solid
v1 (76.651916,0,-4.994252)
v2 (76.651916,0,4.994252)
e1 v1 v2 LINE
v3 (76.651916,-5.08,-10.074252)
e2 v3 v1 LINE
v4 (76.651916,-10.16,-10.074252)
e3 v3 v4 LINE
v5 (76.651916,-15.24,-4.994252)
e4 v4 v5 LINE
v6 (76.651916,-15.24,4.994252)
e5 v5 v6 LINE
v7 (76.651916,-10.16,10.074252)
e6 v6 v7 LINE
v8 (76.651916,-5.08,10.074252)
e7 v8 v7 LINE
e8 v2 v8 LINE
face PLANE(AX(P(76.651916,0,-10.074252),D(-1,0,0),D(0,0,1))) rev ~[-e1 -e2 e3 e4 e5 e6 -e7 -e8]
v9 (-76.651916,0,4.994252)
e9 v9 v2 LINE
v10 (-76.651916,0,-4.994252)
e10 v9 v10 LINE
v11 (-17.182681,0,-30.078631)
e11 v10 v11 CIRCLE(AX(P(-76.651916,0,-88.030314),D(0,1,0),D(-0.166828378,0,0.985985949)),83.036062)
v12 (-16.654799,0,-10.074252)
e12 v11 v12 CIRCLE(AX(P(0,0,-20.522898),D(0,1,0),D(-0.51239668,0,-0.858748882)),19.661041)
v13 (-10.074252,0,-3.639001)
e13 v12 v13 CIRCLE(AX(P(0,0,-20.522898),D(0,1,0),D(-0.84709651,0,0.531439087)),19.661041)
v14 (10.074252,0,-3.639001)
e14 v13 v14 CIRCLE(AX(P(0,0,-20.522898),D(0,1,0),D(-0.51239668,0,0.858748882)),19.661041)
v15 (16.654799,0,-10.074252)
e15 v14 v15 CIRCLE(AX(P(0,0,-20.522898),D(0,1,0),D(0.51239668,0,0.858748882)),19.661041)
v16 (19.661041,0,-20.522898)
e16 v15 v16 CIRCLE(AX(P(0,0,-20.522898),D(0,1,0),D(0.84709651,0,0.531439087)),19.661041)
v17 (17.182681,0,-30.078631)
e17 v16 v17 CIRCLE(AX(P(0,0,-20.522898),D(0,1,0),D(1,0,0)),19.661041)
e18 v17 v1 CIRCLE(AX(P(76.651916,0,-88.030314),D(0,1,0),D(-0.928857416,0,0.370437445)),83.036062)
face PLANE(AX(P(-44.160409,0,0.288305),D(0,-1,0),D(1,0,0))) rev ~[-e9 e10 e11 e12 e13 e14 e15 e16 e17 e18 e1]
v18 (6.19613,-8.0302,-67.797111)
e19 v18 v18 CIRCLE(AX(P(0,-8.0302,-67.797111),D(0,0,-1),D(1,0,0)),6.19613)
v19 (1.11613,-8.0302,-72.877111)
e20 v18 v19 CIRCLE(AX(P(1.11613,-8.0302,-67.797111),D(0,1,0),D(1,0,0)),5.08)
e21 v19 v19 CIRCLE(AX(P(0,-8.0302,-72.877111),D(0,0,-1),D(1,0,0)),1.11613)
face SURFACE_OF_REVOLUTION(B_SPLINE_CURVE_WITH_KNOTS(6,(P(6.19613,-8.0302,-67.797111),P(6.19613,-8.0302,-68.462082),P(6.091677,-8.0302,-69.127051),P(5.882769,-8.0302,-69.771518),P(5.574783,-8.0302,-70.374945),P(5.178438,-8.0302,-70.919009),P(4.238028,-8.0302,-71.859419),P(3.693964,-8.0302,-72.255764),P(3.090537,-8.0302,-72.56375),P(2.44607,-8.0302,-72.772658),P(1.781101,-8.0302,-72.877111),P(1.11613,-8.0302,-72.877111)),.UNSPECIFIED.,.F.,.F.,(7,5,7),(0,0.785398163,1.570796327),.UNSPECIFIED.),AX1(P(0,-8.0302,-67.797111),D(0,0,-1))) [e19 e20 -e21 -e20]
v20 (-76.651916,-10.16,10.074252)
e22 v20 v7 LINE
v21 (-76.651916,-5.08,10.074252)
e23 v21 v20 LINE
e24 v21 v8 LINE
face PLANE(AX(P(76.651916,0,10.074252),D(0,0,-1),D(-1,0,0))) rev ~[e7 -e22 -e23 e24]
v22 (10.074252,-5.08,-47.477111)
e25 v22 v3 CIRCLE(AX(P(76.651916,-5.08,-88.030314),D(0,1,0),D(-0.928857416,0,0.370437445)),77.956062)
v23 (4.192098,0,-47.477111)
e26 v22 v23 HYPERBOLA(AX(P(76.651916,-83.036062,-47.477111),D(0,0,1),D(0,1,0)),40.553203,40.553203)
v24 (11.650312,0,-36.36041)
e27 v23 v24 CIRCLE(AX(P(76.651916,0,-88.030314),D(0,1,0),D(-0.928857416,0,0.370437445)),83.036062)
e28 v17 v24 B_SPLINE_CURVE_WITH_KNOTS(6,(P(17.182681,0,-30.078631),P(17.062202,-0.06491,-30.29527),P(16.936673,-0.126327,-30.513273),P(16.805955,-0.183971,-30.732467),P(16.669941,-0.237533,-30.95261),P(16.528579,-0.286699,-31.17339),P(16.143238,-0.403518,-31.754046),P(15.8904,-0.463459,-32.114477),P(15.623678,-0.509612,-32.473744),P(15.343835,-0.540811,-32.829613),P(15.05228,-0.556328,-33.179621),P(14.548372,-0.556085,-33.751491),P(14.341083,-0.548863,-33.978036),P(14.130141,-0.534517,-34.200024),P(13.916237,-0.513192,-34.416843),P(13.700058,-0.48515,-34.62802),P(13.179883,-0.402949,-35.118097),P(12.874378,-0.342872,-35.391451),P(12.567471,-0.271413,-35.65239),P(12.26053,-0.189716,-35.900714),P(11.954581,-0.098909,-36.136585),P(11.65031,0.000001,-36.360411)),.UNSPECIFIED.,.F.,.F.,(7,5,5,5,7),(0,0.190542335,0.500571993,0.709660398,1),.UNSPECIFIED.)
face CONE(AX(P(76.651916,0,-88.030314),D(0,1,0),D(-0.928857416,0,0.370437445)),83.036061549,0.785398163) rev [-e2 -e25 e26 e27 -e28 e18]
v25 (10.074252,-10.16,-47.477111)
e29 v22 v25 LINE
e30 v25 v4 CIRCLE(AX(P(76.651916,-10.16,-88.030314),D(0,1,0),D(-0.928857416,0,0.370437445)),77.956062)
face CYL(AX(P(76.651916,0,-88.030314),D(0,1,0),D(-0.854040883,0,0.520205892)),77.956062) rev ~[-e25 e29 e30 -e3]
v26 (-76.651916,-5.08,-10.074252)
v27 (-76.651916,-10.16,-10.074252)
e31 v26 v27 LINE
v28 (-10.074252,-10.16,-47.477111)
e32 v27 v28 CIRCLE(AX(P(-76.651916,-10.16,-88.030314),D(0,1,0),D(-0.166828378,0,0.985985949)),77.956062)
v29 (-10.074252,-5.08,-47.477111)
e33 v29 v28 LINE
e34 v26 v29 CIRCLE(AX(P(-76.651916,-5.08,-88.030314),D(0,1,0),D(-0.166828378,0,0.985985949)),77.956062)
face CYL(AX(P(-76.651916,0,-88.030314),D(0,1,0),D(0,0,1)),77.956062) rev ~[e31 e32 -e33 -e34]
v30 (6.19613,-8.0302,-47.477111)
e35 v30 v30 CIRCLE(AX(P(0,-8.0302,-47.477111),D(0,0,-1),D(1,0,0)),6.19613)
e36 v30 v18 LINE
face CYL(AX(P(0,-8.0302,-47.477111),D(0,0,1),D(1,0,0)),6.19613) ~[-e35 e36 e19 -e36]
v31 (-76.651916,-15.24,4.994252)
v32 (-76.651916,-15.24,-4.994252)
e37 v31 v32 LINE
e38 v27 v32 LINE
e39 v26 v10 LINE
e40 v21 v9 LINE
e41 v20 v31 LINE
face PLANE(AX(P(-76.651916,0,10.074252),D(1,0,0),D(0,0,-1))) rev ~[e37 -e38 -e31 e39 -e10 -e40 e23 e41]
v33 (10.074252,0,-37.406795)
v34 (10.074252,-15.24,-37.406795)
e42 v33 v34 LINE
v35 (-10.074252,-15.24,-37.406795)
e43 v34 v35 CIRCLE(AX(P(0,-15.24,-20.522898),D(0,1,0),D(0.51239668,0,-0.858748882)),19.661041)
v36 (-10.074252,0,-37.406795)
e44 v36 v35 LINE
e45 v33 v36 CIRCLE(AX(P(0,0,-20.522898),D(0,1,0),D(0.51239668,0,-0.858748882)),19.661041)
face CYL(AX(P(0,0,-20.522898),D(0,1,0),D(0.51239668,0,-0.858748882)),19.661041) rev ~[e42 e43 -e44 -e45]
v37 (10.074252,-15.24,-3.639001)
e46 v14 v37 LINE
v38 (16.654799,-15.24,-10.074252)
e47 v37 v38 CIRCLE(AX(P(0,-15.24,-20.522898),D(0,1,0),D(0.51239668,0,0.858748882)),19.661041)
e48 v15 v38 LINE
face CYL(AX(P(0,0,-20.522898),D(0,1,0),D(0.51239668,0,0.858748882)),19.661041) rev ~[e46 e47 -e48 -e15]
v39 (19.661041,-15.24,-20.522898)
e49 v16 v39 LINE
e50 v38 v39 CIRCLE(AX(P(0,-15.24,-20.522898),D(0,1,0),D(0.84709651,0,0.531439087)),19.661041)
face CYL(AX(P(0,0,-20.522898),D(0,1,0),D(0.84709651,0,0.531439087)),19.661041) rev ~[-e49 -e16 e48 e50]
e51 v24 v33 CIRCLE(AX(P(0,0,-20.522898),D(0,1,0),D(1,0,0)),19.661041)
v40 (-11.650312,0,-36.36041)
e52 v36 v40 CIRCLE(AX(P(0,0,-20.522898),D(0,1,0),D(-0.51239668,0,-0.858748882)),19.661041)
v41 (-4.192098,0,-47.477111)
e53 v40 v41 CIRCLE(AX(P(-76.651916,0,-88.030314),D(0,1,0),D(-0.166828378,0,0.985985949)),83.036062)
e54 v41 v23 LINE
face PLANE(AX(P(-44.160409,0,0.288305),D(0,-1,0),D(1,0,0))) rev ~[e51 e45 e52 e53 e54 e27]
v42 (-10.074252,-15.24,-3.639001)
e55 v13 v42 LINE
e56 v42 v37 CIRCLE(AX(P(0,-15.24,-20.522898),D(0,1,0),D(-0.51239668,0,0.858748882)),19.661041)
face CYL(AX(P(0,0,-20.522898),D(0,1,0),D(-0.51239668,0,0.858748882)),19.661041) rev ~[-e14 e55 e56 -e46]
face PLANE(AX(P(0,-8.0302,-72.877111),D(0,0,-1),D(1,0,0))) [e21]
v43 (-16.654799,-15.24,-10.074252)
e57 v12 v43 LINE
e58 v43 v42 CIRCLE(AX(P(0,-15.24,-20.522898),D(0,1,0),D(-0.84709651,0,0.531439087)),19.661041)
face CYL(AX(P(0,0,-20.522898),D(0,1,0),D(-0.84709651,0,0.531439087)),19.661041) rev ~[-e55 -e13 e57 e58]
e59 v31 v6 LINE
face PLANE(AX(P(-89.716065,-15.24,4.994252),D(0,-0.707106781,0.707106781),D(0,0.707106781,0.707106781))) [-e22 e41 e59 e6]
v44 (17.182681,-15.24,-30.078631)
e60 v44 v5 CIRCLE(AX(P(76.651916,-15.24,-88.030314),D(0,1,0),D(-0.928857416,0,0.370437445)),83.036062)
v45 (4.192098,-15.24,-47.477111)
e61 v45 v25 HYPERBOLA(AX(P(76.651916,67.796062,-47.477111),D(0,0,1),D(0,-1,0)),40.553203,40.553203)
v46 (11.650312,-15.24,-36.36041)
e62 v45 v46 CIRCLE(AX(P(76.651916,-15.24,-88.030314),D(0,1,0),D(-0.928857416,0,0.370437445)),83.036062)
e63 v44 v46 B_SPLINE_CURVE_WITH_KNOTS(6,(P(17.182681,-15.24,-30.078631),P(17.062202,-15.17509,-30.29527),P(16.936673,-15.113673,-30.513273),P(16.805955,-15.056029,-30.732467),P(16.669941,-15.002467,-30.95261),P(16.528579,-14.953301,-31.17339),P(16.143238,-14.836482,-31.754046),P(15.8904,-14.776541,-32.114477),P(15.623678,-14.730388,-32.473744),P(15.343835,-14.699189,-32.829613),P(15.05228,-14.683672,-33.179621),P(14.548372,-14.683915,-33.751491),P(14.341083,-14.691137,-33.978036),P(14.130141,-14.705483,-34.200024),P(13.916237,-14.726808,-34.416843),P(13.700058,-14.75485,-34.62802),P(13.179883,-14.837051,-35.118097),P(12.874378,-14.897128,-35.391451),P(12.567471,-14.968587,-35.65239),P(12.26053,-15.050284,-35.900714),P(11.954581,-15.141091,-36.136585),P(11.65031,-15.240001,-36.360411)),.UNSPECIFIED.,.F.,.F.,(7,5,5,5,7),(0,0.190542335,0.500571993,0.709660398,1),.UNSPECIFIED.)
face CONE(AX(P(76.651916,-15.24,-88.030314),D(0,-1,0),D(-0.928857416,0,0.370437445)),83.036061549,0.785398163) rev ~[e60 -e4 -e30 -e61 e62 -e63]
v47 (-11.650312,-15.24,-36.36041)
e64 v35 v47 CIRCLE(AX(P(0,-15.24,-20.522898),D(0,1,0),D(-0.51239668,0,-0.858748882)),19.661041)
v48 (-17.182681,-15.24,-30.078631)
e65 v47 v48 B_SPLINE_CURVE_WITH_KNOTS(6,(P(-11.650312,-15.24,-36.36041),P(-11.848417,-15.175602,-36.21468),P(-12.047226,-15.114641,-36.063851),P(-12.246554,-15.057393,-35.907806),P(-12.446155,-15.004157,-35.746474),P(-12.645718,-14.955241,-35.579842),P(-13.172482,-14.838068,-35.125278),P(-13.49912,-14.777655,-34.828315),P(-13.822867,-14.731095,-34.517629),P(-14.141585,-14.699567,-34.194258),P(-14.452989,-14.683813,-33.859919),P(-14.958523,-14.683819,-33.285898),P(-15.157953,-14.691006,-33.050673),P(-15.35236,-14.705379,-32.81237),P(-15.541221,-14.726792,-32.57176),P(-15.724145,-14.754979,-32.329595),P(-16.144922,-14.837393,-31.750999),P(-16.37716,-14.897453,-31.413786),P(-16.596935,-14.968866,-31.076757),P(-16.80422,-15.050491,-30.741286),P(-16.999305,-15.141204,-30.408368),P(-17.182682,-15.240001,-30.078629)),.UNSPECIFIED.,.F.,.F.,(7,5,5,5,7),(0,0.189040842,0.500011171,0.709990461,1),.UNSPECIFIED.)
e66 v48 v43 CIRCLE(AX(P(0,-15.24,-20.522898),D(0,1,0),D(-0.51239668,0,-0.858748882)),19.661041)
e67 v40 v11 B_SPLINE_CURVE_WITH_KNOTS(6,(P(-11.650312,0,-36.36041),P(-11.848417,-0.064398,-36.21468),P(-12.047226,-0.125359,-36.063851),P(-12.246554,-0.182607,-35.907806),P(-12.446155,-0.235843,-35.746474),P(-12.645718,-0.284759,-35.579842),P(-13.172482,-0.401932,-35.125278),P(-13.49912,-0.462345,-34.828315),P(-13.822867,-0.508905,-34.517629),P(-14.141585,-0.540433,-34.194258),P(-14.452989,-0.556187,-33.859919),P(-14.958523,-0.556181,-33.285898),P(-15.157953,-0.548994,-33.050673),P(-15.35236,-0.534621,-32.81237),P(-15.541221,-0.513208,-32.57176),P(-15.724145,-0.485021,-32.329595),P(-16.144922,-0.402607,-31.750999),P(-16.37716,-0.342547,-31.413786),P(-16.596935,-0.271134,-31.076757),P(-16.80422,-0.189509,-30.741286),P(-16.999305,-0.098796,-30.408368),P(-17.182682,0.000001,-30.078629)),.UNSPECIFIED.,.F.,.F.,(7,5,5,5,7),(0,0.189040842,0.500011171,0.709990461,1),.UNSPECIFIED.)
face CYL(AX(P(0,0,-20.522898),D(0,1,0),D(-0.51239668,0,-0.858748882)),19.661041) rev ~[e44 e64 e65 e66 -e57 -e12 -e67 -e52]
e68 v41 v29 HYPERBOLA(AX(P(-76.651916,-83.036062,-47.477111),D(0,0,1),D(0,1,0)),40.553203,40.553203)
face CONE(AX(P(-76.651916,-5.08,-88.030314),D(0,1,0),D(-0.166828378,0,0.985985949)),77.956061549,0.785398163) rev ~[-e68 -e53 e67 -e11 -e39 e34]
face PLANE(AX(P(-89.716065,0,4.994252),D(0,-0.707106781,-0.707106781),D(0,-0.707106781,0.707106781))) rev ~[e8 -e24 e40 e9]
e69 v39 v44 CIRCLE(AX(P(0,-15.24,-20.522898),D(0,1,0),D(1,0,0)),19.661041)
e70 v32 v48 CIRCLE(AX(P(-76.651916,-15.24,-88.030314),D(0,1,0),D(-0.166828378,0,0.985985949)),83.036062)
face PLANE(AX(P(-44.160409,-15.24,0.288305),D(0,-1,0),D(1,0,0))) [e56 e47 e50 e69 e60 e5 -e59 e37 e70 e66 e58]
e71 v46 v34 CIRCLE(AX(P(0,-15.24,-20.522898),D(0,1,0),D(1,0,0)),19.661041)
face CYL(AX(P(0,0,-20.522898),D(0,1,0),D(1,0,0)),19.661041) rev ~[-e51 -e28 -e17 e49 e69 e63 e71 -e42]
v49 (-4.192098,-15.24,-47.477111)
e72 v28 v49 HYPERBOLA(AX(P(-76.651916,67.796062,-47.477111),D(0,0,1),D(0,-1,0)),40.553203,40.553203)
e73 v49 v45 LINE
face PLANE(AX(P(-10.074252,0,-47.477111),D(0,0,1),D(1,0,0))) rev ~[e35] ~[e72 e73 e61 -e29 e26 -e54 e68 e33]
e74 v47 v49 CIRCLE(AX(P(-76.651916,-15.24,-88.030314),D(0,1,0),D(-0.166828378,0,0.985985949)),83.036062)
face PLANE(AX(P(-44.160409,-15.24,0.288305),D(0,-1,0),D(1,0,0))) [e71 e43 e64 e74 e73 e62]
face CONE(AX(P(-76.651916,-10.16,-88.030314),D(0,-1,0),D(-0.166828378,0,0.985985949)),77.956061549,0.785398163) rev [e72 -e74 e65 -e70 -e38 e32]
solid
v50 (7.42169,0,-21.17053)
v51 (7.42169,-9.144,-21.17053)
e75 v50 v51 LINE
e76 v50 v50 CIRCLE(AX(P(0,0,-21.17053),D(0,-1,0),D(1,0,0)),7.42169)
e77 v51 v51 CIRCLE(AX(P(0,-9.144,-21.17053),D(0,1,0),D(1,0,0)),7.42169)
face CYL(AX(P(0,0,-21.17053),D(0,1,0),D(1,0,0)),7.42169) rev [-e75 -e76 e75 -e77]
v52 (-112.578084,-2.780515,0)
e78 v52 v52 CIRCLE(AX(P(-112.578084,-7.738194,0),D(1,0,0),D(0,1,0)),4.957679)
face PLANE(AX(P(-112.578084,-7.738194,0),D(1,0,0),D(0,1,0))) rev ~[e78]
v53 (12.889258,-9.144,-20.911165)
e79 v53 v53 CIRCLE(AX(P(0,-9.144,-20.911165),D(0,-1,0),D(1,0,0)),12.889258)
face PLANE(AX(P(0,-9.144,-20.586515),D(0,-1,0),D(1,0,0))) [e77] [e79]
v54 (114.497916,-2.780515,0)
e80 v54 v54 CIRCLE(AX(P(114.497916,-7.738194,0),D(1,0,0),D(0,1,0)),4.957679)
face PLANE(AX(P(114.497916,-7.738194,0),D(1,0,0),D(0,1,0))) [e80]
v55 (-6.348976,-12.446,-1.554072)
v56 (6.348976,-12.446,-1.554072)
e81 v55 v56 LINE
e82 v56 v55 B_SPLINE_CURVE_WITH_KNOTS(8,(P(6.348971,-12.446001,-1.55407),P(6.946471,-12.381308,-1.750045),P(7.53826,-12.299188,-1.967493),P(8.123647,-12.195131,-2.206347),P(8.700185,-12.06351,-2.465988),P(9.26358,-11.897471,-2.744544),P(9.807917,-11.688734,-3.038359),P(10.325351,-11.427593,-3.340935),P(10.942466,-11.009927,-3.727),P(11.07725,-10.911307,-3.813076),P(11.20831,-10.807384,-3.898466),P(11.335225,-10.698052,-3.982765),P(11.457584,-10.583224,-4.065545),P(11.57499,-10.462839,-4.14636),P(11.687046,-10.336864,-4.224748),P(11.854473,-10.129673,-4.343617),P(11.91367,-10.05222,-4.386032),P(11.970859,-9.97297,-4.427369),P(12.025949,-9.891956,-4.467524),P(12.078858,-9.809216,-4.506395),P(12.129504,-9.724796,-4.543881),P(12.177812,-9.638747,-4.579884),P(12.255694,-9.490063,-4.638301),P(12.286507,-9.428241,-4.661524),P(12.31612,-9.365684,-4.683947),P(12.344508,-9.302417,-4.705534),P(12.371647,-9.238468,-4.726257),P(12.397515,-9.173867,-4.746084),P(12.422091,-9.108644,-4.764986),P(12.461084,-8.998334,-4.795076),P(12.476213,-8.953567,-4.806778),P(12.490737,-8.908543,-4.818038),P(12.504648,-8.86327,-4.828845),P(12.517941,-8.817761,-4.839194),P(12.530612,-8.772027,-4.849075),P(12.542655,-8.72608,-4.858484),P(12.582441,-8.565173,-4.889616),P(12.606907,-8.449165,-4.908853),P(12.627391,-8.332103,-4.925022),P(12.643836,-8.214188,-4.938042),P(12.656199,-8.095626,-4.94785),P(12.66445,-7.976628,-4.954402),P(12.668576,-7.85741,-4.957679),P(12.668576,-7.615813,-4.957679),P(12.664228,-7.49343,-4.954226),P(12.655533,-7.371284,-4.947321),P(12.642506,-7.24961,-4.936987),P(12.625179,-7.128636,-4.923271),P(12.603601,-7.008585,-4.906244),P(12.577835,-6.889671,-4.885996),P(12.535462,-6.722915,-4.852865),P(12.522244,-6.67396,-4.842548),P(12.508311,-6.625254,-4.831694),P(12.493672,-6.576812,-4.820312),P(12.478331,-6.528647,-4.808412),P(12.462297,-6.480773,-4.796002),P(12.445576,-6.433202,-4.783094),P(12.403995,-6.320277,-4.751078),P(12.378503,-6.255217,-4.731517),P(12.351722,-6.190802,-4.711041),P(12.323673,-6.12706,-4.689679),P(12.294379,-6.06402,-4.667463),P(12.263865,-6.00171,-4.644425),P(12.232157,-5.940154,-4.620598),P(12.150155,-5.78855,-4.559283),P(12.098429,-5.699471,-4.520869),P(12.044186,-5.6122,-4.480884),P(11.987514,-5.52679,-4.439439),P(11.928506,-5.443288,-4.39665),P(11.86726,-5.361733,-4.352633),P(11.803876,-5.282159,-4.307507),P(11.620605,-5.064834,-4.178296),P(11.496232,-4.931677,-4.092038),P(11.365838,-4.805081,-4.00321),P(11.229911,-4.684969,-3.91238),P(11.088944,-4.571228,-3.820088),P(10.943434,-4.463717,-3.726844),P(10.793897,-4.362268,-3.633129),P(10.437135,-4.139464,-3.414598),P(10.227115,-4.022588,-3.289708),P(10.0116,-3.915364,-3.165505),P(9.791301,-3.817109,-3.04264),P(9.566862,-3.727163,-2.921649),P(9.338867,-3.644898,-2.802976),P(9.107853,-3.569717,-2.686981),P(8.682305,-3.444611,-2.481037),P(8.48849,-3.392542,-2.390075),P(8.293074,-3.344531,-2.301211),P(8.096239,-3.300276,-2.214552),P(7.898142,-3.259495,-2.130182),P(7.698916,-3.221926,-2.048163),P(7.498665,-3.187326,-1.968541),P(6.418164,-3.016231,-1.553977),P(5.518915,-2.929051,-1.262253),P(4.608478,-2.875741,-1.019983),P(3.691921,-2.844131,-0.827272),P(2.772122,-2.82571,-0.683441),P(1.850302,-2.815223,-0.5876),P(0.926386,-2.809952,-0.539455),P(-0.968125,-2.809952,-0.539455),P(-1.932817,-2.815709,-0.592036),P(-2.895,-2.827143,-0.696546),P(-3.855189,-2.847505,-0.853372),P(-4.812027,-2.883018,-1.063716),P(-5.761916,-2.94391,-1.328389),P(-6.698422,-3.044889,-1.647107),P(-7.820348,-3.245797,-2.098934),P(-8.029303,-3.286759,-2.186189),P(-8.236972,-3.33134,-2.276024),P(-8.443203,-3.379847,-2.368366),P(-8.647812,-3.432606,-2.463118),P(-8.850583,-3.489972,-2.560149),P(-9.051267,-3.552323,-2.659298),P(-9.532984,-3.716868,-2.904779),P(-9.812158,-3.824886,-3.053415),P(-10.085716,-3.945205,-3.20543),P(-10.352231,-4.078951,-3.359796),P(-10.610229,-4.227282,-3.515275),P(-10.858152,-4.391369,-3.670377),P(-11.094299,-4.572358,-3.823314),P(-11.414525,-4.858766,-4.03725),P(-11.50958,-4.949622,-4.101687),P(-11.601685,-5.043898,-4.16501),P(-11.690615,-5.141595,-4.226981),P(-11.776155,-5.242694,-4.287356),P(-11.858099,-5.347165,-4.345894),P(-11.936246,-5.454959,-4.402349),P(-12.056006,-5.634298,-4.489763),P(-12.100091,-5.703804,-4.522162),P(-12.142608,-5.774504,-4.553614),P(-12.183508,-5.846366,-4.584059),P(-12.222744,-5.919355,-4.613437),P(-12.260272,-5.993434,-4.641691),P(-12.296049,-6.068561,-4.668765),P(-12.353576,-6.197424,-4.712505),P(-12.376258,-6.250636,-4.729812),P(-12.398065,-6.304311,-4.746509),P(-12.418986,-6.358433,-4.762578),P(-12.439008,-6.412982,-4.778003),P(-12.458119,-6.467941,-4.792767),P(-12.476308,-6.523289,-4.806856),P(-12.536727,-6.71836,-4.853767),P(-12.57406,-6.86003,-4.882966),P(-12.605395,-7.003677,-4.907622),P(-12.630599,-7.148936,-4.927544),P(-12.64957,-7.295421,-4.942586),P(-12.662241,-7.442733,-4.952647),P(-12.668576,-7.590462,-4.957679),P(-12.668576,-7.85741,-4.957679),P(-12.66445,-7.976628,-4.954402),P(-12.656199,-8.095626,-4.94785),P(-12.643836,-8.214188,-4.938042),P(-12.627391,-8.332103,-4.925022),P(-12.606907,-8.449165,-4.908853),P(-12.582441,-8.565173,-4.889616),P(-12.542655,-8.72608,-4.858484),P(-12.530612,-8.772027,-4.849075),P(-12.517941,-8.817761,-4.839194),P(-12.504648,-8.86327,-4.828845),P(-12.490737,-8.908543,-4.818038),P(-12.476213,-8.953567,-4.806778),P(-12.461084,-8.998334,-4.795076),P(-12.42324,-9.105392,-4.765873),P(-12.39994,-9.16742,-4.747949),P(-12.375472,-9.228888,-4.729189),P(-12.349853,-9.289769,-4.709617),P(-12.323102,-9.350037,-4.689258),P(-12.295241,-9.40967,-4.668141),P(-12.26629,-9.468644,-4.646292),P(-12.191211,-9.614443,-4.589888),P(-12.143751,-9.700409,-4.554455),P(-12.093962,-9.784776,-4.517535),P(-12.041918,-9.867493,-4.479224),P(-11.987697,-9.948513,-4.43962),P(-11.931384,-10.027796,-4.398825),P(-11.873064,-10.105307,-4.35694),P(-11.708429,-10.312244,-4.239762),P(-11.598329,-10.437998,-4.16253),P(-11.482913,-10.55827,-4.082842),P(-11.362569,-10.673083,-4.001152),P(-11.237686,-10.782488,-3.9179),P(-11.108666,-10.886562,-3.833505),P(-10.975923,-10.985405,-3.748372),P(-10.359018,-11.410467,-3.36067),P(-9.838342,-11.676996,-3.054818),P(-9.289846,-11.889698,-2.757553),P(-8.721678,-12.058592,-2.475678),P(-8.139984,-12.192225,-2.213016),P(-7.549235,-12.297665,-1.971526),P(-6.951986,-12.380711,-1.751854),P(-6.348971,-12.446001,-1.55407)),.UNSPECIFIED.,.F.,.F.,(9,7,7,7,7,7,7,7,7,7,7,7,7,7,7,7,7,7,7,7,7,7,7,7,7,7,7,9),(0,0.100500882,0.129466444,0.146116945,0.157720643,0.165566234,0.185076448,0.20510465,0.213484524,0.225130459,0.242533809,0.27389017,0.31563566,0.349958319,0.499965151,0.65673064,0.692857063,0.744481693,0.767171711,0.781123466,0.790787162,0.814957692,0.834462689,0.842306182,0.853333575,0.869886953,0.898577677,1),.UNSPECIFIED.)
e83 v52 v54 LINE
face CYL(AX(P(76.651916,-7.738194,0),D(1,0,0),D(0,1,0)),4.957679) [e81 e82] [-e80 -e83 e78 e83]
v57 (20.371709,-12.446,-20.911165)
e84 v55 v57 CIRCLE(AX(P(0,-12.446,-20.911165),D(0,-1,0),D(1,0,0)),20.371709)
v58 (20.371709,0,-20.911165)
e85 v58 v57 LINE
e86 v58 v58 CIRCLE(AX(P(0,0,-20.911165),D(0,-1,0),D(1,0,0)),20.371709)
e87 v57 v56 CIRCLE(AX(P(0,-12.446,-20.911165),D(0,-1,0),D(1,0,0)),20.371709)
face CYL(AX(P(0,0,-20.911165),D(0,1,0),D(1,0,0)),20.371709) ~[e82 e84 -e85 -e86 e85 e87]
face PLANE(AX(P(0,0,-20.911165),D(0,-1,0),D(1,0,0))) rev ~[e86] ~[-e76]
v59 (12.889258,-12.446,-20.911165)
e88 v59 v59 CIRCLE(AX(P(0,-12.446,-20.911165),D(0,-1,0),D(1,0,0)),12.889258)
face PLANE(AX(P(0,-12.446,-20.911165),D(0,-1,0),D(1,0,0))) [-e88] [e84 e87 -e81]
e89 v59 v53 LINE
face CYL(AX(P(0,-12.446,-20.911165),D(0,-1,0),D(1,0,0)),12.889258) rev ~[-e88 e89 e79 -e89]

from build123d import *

# Parameters (mm, degrees)
F1_DEPTH      = 15.24
F2_R          = 6.1961301732
F3_DEPTH      = 25.4
F4_R          = 5.08
F5_R          = 4.9576785655
F6_DEPTH      = 37.846
F6_DEPTH_BACK = 189.23
F7_R          = 20.3717092778
F8_DEPTH      = 12.446
F9_R          = 12.889258446
F10_DEPTH     = 7.874
F11_R         = 13.1511811708
F12_DEPTH     = 5.08
F14_R         = 14.9583115279
F13_R         = 7.4216902204
F15_DEPTH     = 9.144
F16_DEPTH     = 47.752
F17_T1_DEPTH  = 179.4321309735
F17_T6_ANGLE  = 77.8608670263
F17_T11_ANGLE = 77.8608670263
F17_T16_ANGLE = 77.8608670263
F17_T21_ANGLE = 77.8608670263


# Not quite as in the source:
# - a fillet or chamfer that OpenCascade refuses, or shapes differently, is made with other operations: its cross-section is extruded or revolved along the edge and cut away or added


with BuildPart() as f1:
    # F0 (on Front) → F1 (new body)
    with BuildSketch(Plane.XZ):
        with BuildLine():
            Line((-76.6519159079, 10.0742522627), (-76.6519159079, -10.0742522627))
            Line((-76.6519159079, -10.0742522627), (-16.654799417, -10.0742522627))
            ThreePointArc((-16.654799417, -10.0742522627), (-13.7464055669, -6.4661247251), (-10.0742522627, -3.6390008817))
            Line((-10.0742522627, -3.6390008817), (-10.0742522627, 10.0742522627))
            Line((-10.0742522627, 10.0742522627), (-76.6519159079, 10.0742522627))
        make_face()
        with BuildLine():
            Line((-16.654799417, -10.0742522627), (-76.6519159079, -10.0742522627))
            ThreePointArc((-76.6519159079, -10.0742522627), (-38.4695929071, -20.0651922972), (-10.0742522627, -47.4771112778))
            Line((-10.0742522627, -47.4771112778), (-10.0742522627, -37.4067952444))
            ThreePointArc((-10.0742522627, -37.4067952444), (-19.1148509643, -25.124964479), (-16.654799417, -10.0742522627))
        make_face()
        with BuildLine():
            Line((10.0742522627, 10.0742522627), (10.0742522627, -3.6390008817))
            ThreePointArc((10.0742522627, -3.6390008817), (13.7464055669, -6.4661247251), (16.654799417, -10.0742522627))
            Line((16.654799417, -10.0742522627), (76.6519159079, -10.0742522627))
            Line((76.6519159079, -10.0742522627), (76.6519159079, 10.0742522627))
            Line((76.6519159079, 10.0742522627), (10.0742522627, 10.0742522627))
        make_face()
        with BuildLine():
            Line((10.0742522627, -37.4067952444), (10.0742522627, -47.4771112778))
            ThreePointArc((10.0742522627, -47.4771112778), (38.4695929071, -20.0651922972), (76.6519159079, -10.0742522627))
            Line((76.6519159079, -10.0742522627), (16.654799417, -10.0742522627))
            ThreePointArc((16.654799417, -10.0742522627), (18.8945394345, -15.0866381133), (19.6610412411, -20.5228980631))
            ThreePointArc((19.6610412411, -20.5228980631), (17.0971756716, -30.230787985), (10.0742522627, -37.4067952444))
        make_face()
        with BuildLine():
            Line((-10.0742522627, 10.0742522627), (-10.0742522627, -3.6390008817))
            ThreePointArc((-10.0742522627, -3.6390008817), (0, -0.861856822), (10.0742522627, -3.6390008817))
            Line((10.0742522627, -3.6390008817), (10.0742522627, 10.0742522627))
            Line((10.0742522627, 10.0742522627), (-10.0742522627, 10.0742522627))
        make_face()
        with BuildLine():
            Line((-10.0742522627, -37.4067952444), (-10.0742522627, -47.4771112778))
            Line((-10.0742522627, -47.4771112778), (10.0742522627, -47.4771112778))
            Line((10.0742522627, -47.4771112778), (10.0742522627, -37.4067952444))
            ThreePointArc((10.0742522627, -37.4067952444), (0, -40.1839393041), (-10.0742522627, -37.4067952444))
        make_face()
    extrude(amount=F1_DEPTH)

    # F2 (on face) → F3 (join)
    with BuildSketch(Plane(origin=(0, 0, -47.4771112778), x_dir=(1, 0, 0), z_dir=(0, 0, -1))):
        with Locations((0, 8.0302003771)):
            Circle(F2_R)
    extrude(amount=F3_DEPTH)

    # F4
    f4_edges = [f1.edges().sort_by_distance(p)[0] for p in [
        (-6.19613, -8.0302, -72.877111),
    ]]
    fillet(f4_edges, radius=F4_R)

    # F17: chamfer of 5.08 on 6 edges, made by hand

    # F17_s2 → F17_t1 (cut)
    with BuildSketch(Plane.YZ.offset(-89.7160654867)):
        Polygon((-15.24, 4.9942522627), (-10.16, 10.0742522627), (-15.24, 10.0742522627), align=None)
        Polygon((0, 4.9942522627), (-5.08, 10.0742522627), (0, 10.0742522627), align=None)
    extrude(amount=F17_T1_DEPTH, mode=Mode.SUBTRACT)


with BuildPart() as f6:
    # F5 (on face) → F6 (new body, two sides)
    with BuildSketch(Plane.YZ.offset(76.6519159079)) as f6_sk:
        with Locations((-7.7381939627, 0)):
            Circle(F5_R)
    extrude(amount=F6_DEPTH)
    extrude(f6_sk.sketch, amount=-F6_DEPTH_BACK)

    # F7 (on Front) → F8 (join)
    with BuildSketch(Plane.XZ):
        with Locations((0, -20.9111645818)):
            Circle(F7_R)
    extrude(amount=F8_DEPTH)

    # F9 (on face) → F10 (cut)
    with BuildSketch(Plane.XZ.offset(12.446)):
        with Locations((0, -20.9111645818)):
            Circle(F9_R)
    extrude(amount=-F10_DEPTH, mode=Mode.SUBTRACT)

    # F11 (on face) → F12 (cut)
    with BuildSketch(Plane(origin=(0, 0, 0), x_dir=(-1, 0, 0), z_dir=(0, 1, 0))):
        with Locations((0, -20.9111645818)):
            Circle(F11_R)
    extrude(amount=-F12_DEPTH, mode=Mode.SUBTRACT)

    # F14 (on face) + F13 (on Front) → F15 (join)
    with BuildSketch(Plane.XZ):
        with Locations((0, -20.5865148455)):
            Circle(F14_R)
    with BuildSketch(Plane.XZ):
        with Locations((0, -21.1705304682)):
            Circle(F13_R)
    extrude(amount=F15_DEPTH)

    # F13 (on Front) → F16 (cut)
    with BuildSketch(Plane.XZ):
        with Locations((0, -21.1705304682)):
            Circle(F13_R)
    extrude(amount=F16_DEPTH, mode=Mode.SUBTRACT)


with BuildPart() as f17_tool4:
    # F17_s5 → F17_t6 (revolve)
    with BuildSketch(Plane(origin=(-88.9987069649, 0, -15.0585411126), x_dir=(0, 1, 0), z_dir=(-0.9859859493, 0, -0.1668283783))):
        Polygon((-10.16, -3.9471238438), (-15.24, -9.0271238438), (-15.24, -3.9471238438), align=None)
    revolve(axis=Axis((-76.6519159079, -15.24, -88.0303138114), (0, 1, 0)), revolution_arc=F17_T6_ANGLE)

    split(bisect_by=Plane.XY.offset(-47.4771112778), keep=Keep.TOP)


with BuildPart() as f1_1:
    add(f1.part)

    # F17_t3: cut F17_tool4
    add(f17_tool4.part, mode=Mode.SUBTRACT)


with BuildPart() as f17_tool9:
    # F17_s10 → F17_t11 (revolve)
    with BuildSketch(Plane(origin=(-19.7713095684, 0, -49.575786093), x_dir=(0, 1, 0), z_dir=(-0.3704374447, 0, -0.9288574162))):
        Polygon((-15.24, 20.7723635106), (-10.16, 25.8523635106), (-15.24, 25.8523635106), align=None)
    revolve(axis=Axis((76.6519159079, -15.24, -88.0303138114), (0, 1, 0)), revolution_arc=F17_T11_ANGLE)

    split(bisect_by=Plane.XY.offset(-47.4771112778), keep=Keep.TOP)


with BuildPart() as f1_2:
    add(f1_1.part)

    # F17_t8: cut F17_tool9
    add(f17_tool9.part, mode=Mode.SUBTRACT)


with BuildPart() as f17_tool14:
    # F17_s15 → F17_t16 (revolve)
    with BuildSketch(Plane(origin=(-19.7713095684, 0, -49.575786093), x_dir=(0, 1, 0), z_dir=(-0.3704374447, 0, -0.9288574162))):
        Polygon((0, 20.7723635106), (-5.08, 25.8523635106), (0, 25.8523635106), align=None)
    revolve(axis=Axis((76.6519159079, 0, -88.0303138114), (0, 1, 0)), revolution_arc=F17_T16_ANGLE)

    split(bisect_by=Plane.XY.offset(-47.4771112778), keep=Keep.TOP)


with BuildPart() as f1_3:
    add(f1_2.part)

    # F17_t13: cut F17_tool14
    add(f17_tool14.part, mode=Mode.SUBTRACT)


with BuildPart() as f17_tool19:
    # F17_s20 → F17_t21 (revolve)
    with BuildSketch(Plane(origin=(-88.9987069649, 0, -15.0585411126), x_dir=(0, 1, 0), z_dir=(-0.9859859493, 0, -0.1668283783))):
        Polygon((-5.08, -3.9471238438), (0, -9.0271238438), (0, -3.9471238438), align=None)
    revolve(axis=Axis((-76.6519159079, 0, -88.0303138114), (0, 1, 0)), revolution_arc=F17_T21_ANGLE)

    split(bisect_by=Plane.XY.offset(-47.4771112778), keep=Keep.TOP)


with BuildPart() as f1_4:
    add(f1_3.part)

    # F17_t18: cut F17_tool19
    add(f17_tool19.part, mode=Mode.SUBTRACT)


solid = Compound([f6.part, f1_4.part])
